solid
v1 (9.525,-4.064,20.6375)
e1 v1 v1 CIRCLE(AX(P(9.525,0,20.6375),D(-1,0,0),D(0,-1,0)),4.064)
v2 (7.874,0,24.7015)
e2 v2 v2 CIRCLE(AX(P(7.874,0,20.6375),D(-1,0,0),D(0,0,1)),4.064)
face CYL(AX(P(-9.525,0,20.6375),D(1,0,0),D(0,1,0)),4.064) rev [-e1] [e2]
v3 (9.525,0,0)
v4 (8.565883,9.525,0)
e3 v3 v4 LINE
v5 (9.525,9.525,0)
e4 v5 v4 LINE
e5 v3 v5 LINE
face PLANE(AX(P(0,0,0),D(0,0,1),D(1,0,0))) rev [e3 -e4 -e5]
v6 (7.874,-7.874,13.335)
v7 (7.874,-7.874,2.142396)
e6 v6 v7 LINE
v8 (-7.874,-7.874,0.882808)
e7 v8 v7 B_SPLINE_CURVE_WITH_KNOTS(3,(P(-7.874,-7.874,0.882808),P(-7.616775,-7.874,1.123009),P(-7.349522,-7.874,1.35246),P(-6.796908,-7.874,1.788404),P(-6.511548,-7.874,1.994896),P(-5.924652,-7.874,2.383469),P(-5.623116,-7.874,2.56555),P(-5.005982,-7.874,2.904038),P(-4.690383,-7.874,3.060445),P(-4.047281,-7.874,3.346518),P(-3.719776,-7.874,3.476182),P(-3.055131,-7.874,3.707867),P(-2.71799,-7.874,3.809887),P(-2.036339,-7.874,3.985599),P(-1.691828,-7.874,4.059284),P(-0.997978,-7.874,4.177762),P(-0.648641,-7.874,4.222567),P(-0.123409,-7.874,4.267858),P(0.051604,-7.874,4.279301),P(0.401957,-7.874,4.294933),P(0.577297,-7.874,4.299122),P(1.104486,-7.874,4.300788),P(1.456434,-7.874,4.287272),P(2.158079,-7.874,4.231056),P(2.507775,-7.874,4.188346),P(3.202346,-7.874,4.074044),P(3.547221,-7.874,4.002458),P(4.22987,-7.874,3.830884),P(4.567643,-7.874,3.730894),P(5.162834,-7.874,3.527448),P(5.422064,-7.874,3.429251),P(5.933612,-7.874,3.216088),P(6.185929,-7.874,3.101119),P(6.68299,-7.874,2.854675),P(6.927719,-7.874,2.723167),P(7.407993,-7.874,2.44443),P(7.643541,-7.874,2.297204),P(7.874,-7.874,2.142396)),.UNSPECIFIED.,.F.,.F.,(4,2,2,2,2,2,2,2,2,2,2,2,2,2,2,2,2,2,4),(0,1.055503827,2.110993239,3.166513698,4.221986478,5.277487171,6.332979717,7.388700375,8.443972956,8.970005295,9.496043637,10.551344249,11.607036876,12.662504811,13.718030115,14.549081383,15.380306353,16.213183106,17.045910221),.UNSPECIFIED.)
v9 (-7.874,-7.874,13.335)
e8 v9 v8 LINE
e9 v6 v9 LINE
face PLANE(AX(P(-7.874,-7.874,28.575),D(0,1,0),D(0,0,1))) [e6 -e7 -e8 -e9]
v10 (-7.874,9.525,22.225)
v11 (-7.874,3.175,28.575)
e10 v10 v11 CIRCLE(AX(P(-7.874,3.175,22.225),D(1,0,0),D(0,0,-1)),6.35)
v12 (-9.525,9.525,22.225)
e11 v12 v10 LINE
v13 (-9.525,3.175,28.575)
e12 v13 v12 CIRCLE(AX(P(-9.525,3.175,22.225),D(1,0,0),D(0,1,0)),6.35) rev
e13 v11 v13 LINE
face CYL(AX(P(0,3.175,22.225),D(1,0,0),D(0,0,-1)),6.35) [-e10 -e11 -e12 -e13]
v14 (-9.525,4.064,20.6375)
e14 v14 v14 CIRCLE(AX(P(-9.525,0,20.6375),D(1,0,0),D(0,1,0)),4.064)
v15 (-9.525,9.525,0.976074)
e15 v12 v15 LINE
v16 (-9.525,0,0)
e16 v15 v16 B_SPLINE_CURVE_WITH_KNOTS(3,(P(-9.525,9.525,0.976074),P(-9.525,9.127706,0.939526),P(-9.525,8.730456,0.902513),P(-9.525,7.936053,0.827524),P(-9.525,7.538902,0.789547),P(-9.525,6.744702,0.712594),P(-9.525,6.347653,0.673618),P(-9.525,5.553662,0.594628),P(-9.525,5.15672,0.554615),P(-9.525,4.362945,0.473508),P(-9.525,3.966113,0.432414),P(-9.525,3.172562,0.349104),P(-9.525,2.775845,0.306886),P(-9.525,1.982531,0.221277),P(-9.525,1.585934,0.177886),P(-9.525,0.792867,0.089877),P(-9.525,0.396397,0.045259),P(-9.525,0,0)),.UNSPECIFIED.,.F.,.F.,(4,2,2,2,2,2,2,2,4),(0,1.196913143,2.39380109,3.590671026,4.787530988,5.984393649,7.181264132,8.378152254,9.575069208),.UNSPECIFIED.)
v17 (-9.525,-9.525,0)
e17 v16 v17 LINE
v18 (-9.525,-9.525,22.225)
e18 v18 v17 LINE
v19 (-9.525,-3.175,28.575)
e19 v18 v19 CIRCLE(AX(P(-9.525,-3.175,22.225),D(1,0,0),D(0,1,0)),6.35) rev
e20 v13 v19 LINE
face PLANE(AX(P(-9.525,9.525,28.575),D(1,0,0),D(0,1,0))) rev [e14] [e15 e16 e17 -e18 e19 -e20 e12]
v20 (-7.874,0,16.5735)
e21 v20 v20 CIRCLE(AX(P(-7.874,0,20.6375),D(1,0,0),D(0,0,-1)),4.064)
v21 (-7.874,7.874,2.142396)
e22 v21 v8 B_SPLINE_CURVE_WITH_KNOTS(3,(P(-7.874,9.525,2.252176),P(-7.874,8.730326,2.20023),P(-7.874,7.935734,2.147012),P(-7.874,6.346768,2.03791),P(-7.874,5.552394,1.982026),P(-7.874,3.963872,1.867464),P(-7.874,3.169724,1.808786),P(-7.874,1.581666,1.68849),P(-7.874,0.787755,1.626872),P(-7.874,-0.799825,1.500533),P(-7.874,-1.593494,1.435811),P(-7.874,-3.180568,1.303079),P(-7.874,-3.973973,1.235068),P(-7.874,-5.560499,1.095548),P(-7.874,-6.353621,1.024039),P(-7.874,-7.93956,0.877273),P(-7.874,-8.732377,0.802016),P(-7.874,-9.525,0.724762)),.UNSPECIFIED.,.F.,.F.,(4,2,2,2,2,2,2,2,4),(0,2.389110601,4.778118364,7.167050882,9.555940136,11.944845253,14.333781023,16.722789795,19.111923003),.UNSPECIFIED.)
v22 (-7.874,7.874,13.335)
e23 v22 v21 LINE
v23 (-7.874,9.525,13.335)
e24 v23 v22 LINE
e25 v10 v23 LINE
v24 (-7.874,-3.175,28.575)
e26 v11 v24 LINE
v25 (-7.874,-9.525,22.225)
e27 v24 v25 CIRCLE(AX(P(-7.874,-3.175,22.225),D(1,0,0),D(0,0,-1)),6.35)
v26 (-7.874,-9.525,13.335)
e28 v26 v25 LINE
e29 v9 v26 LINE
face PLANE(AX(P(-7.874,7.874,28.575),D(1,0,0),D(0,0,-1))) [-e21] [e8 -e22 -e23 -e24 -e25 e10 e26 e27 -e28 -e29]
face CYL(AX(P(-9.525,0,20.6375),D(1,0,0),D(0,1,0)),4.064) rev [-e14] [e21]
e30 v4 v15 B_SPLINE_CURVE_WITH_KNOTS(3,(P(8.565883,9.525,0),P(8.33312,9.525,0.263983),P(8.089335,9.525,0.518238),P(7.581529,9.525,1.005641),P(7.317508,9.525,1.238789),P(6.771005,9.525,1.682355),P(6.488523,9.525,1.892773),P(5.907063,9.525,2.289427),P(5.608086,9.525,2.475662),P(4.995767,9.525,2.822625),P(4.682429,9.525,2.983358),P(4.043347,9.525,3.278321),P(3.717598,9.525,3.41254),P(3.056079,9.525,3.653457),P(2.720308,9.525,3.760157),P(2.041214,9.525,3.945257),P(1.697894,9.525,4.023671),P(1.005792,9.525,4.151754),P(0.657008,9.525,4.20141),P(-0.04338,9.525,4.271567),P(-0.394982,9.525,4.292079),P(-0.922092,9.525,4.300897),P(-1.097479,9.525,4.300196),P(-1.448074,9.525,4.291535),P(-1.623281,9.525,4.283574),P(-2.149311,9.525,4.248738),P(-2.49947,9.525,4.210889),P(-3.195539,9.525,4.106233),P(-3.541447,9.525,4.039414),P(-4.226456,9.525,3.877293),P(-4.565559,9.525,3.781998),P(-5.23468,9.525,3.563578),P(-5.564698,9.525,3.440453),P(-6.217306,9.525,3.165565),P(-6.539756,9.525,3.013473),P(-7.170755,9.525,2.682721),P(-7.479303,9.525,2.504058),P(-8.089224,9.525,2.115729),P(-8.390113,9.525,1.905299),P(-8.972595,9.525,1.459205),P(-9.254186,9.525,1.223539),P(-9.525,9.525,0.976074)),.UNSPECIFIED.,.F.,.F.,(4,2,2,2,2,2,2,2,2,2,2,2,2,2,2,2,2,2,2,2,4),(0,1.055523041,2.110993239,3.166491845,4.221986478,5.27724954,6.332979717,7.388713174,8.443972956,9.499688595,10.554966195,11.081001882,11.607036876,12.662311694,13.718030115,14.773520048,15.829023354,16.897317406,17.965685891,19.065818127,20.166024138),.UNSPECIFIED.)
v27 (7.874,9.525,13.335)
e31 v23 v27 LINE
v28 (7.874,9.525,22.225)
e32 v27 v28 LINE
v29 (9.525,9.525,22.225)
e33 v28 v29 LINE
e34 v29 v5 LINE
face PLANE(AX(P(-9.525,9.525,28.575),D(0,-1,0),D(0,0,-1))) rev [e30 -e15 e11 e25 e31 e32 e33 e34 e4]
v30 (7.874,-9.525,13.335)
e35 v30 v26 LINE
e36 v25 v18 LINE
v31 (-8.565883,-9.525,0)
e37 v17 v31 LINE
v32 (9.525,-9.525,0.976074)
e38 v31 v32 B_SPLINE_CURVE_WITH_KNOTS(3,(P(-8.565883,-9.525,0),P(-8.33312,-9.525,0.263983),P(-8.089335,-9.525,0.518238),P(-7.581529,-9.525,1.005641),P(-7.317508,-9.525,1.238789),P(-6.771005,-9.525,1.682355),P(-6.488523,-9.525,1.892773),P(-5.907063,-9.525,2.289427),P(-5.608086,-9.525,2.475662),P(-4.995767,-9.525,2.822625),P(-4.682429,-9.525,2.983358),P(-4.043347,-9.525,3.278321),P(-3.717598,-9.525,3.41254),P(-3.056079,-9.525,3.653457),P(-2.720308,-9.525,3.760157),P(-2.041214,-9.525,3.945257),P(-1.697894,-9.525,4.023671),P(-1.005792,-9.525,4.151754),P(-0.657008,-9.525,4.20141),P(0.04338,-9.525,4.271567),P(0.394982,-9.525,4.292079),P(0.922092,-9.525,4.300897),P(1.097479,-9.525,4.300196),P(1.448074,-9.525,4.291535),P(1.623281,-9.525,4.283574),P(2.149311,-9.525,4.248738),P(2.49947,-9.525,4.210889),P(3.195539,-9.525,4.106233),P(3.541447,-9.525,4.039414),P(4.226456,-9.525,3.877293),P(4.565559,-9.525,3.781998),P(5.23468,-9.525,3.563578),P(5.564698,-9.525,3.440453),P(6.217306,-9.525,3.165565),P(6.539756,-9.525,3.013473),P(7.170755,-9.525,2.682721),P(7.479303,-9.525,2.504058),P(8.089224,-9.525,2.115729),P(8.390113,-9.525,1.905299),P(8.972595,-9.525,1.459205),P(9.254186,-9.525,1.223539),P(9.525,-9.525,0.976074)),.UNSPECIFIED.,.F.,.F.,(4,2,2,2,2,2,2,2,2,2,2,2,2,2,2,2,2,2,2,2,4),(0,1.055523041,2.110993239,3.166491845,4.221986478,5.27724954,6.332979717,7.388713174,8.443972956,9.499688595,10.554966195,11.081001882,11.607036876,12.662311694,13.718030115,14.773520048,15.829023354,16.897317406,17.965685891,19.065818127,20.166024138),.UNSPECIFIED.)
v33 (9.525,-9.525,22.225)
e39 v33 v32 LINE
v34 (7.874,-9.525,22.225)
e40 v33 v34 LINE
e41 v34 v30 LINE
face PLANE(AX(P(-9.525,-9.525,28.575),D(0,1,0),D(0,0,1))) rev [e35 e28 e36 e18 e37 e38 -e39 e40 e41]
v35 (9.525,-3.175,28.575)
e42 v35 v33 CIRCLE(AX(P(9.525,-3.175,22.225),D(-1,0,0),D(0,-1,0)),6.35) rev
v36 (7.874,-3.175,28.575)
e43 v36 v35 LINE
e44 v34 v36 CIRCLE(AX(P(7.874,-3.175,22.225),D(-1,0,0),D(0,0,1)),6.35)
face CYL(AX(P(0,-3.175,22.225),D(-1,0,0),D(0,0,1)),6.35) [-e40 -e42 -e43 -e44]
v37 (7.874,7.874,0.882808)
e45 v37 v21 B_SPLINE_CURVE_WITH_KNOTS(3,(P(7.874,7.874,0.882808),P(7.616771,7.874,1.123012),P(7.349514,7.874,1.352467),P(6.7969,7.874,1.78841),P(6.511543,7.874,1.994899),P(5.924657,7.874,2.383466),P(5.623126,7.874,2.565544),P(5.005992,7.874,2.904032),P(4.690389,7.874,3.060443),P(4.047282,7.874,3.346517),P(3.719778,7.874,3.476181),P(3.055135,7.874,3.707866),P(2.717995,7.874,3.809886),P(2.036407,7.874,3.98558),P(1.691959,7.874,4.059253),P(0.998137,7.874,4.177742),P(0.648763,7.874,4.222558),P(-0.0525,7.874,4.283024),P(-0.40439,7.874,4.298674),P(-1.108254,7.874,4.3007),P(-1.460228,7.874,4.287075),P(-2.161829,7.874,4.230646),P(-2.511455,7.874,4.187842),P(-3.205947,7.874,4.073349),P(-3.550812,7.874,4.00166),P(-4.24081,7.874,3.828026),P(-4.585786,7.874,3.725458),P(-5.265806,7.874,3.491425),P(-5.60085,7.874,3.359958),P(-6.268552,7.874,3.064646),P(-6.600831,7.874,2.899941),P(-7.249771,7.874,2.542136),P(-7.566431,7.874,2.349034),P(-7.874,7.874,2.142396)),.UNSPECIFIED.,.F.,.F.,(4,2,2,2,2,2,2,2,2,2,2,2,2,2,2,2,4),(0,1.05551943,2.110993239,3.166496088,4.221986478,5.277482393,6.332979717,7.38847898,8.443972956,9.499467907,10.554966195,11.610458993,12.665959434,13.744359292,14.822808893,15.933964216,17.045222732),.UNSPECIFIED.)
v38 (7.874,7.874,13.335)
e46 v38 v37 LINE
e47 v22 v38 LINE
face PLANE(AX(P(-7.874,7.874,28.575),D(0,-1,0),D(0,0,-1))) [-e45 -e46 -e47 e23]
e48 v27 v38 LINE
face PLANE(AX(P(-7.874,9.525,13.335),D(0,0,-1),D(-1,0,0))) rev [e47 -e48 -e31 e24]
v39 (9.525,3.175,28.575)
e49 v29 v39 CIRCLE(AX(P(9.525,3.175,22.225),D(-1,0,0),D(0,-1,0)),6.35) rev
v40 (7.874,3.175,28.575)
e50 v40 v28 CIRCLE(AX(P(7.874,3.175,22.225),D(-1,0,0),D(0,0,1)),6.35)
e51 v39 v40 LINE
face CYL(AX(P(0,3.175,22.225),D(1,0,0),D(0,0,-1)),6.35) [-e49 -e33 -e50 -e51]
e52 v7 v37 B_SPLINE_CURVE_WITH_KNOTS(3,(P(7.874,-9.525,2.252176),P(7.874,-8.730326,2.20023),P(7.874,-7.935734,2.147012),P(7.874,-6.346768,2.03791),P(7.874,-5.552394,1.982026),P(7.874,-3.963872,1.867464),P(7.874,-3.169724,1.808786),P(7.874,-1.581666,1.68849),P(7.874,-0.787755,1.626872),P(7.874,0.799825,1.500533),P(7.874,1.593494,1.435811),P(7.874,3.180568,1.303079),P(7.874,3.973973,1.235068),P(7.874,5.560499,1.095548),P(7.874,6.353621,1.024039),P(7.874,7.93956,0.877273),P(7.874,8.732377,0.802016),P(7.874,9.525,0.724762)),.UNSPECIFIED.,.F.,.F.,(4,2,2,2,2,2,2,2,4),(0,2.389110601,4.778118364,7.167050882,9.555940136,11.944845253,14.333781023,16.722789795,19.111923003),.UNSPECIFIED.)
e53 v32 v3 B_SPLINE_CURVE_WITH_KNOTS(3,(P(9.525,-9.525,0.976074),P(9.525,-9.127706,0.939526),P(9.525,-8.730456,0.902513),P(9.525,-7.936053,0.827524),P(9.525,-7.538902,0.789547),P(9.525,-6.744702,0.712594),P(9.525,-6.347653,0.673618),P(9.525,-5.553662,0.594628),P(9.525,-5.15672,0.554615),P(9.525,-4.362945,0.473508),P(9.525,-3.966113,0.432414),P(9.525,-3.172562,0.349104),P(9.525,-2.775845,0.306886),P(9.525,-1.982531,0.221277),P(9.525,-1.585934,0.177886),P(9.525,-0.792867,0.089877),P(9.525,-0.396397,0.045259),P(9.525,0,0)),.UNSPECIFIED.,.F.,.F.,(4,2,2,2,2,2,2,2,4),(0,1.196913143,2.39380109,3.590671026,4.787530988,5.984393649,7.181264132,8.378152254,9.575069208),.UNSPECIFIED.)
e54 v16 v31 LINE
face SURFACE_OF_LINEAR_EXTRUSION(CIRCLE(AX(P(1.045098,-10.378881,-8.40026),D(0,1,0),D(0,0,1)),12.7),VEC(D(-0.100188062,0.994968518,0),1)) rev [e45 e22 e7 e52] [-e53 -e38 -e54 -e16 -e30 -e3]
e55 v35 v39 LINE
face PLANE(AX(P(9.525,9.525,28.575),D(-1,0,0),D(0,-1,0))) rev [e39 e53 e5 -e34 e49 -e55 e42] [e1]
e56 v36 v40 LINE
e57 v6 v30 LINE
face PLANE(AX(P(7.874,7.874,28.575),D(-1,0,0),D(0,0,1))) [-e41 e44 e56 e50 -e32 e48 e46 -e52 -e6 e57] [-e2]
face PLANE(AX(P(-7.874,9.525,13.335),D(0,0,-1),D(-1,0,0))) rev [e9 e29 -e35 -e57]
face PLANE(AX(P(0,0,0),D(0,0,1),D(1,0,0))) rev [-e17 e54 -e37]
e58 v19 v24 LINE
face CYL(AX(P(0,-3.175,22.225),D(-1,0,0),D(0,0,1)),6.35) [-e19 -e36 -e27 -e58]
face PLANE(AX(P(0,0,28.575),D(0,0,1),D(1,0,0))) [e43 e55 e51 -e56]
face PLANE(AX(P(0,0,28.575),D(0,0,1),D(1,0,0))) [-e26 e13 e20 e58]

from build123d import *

# Parameters (mm, degrees)
SKETCH1_W               = 19.05
SKETCH1_H               = 19.05
SKETCH1_W_2             = 15.748
SKETCH1_H_2             = 15.748
BOSS_EXTRUDE1_DEPTH     = 28.575
CUT_EXTRUDE2_DEPTH      = 36.639286609
CUT_EXTRUDE2_DEPTH_BACK = 36.639286609
SKETCH3_R               = 4.064
CUT_EXTRUDE4_DEPTH      = 36.639286609
CUT_EXTRUDE4_DEPTH_BACK = 36.639286609
SKETCH4_W               = 15.748
SKETCH4_H               = 15.24
FILLET2_R               = 6.35
CUT_EXTRUDE5_START      = -10.431366523
CUT_EXTRUDE5_DEPTH      = 20.862732946


# Read off the part's stored shape, not the designer's step: Cut-Extrude5
with BuildPart() as part:
    # Sketch1 → Boss-Extrude1 (new body)
    with BuildSketch(Plane.XY):
        Rectangle(SKETCH1_W, SKETCH1_H)
        Rectangle(SKETCH1_W_2, SKETCH1_H_2, mode=Mode.SUBTRACT)
    extrude(amount=BOSS_EXTRUDE1_DEPTH)

    # Sketch3 → Cut-Extrude2 (cut, two sides: drawn at the far end of the back side and taken through both)
    with BuildSketch(Plane(origin=(9.525, 0, 0), x_dir=(0, 0, -1), z_dir=(1, 0, 0)).offset(-CUT_EXTRUDE2_DEPTH_BACK)):
        with Locations(Location((-20.6375, 0, 0), (0, 0, 90))):
            Circle(SKETCH3_R)
    extrude(amount=CUT_EXTRUDE2_DEPTH + CUT_EXTRUDE2_DEPTH_BACK, mode=Mode.SUBTRACT)

    # Sketch4 → Cut-Extrude4 (cut, two sides: drawn at the far end of the back side and taken through both)
    with BuildSketch(Plane.XZ.offset(9.525).offset(-CUT_EXTRUDE4_DEPTH_BACK)):
        with Locations((0, 20.955)):
            Rectangle(SKETCH4_W, SKETCH4_H)
    extrude(amount=CUT_EXTRUDE4_DEPTH + CUT_EXTRUDE4_DEPTH_BACK, mode=Mode.SUBTRACT)

    # Fillet2
    fillet2_edges = [part.edges().sort_by_distance(p)[0] for p in [
        (-8.6995, -9.525, 28.575),
        (8.6995, -9.525, 28.575),
        (-8.6995, 9.525, 28.575),
        (8.6995, 9.525, 28.575),
    ]]
    fillet(fillet2_edges, radius=FILLET2_R)

    # Cut-Extrude5 outline → Cut-Extrude5 (cut)
    with BuildSketch(Plane(origin=(0, 0, 0), x_dir=(0.9949685182509123, 0.10018806161207, 0), z_dir=(0.10018806161207001, -0.9949685182509123, 0)).offset(CUT_EXTRUDE5_START)):
        with BuildLine():
            add(Edge.make_bspline(
                [(-9.477075136, 0), (0, 10.800334816), (9.477075136, 0)],
                knots=[5.435123228, 5.435123228, 5.435123228, 7.131247386, 7.131247386, 7.131247386], degree=2, weights=[1, 0.661437828, 1]))
            Line((-9.477075136, 0), (9.477075136, 0))
        make_face()
    extrude(amount=CUT_EXTRUDE5_DEPTH, mode=Mode.SUBTRACT)


solid = part.part
